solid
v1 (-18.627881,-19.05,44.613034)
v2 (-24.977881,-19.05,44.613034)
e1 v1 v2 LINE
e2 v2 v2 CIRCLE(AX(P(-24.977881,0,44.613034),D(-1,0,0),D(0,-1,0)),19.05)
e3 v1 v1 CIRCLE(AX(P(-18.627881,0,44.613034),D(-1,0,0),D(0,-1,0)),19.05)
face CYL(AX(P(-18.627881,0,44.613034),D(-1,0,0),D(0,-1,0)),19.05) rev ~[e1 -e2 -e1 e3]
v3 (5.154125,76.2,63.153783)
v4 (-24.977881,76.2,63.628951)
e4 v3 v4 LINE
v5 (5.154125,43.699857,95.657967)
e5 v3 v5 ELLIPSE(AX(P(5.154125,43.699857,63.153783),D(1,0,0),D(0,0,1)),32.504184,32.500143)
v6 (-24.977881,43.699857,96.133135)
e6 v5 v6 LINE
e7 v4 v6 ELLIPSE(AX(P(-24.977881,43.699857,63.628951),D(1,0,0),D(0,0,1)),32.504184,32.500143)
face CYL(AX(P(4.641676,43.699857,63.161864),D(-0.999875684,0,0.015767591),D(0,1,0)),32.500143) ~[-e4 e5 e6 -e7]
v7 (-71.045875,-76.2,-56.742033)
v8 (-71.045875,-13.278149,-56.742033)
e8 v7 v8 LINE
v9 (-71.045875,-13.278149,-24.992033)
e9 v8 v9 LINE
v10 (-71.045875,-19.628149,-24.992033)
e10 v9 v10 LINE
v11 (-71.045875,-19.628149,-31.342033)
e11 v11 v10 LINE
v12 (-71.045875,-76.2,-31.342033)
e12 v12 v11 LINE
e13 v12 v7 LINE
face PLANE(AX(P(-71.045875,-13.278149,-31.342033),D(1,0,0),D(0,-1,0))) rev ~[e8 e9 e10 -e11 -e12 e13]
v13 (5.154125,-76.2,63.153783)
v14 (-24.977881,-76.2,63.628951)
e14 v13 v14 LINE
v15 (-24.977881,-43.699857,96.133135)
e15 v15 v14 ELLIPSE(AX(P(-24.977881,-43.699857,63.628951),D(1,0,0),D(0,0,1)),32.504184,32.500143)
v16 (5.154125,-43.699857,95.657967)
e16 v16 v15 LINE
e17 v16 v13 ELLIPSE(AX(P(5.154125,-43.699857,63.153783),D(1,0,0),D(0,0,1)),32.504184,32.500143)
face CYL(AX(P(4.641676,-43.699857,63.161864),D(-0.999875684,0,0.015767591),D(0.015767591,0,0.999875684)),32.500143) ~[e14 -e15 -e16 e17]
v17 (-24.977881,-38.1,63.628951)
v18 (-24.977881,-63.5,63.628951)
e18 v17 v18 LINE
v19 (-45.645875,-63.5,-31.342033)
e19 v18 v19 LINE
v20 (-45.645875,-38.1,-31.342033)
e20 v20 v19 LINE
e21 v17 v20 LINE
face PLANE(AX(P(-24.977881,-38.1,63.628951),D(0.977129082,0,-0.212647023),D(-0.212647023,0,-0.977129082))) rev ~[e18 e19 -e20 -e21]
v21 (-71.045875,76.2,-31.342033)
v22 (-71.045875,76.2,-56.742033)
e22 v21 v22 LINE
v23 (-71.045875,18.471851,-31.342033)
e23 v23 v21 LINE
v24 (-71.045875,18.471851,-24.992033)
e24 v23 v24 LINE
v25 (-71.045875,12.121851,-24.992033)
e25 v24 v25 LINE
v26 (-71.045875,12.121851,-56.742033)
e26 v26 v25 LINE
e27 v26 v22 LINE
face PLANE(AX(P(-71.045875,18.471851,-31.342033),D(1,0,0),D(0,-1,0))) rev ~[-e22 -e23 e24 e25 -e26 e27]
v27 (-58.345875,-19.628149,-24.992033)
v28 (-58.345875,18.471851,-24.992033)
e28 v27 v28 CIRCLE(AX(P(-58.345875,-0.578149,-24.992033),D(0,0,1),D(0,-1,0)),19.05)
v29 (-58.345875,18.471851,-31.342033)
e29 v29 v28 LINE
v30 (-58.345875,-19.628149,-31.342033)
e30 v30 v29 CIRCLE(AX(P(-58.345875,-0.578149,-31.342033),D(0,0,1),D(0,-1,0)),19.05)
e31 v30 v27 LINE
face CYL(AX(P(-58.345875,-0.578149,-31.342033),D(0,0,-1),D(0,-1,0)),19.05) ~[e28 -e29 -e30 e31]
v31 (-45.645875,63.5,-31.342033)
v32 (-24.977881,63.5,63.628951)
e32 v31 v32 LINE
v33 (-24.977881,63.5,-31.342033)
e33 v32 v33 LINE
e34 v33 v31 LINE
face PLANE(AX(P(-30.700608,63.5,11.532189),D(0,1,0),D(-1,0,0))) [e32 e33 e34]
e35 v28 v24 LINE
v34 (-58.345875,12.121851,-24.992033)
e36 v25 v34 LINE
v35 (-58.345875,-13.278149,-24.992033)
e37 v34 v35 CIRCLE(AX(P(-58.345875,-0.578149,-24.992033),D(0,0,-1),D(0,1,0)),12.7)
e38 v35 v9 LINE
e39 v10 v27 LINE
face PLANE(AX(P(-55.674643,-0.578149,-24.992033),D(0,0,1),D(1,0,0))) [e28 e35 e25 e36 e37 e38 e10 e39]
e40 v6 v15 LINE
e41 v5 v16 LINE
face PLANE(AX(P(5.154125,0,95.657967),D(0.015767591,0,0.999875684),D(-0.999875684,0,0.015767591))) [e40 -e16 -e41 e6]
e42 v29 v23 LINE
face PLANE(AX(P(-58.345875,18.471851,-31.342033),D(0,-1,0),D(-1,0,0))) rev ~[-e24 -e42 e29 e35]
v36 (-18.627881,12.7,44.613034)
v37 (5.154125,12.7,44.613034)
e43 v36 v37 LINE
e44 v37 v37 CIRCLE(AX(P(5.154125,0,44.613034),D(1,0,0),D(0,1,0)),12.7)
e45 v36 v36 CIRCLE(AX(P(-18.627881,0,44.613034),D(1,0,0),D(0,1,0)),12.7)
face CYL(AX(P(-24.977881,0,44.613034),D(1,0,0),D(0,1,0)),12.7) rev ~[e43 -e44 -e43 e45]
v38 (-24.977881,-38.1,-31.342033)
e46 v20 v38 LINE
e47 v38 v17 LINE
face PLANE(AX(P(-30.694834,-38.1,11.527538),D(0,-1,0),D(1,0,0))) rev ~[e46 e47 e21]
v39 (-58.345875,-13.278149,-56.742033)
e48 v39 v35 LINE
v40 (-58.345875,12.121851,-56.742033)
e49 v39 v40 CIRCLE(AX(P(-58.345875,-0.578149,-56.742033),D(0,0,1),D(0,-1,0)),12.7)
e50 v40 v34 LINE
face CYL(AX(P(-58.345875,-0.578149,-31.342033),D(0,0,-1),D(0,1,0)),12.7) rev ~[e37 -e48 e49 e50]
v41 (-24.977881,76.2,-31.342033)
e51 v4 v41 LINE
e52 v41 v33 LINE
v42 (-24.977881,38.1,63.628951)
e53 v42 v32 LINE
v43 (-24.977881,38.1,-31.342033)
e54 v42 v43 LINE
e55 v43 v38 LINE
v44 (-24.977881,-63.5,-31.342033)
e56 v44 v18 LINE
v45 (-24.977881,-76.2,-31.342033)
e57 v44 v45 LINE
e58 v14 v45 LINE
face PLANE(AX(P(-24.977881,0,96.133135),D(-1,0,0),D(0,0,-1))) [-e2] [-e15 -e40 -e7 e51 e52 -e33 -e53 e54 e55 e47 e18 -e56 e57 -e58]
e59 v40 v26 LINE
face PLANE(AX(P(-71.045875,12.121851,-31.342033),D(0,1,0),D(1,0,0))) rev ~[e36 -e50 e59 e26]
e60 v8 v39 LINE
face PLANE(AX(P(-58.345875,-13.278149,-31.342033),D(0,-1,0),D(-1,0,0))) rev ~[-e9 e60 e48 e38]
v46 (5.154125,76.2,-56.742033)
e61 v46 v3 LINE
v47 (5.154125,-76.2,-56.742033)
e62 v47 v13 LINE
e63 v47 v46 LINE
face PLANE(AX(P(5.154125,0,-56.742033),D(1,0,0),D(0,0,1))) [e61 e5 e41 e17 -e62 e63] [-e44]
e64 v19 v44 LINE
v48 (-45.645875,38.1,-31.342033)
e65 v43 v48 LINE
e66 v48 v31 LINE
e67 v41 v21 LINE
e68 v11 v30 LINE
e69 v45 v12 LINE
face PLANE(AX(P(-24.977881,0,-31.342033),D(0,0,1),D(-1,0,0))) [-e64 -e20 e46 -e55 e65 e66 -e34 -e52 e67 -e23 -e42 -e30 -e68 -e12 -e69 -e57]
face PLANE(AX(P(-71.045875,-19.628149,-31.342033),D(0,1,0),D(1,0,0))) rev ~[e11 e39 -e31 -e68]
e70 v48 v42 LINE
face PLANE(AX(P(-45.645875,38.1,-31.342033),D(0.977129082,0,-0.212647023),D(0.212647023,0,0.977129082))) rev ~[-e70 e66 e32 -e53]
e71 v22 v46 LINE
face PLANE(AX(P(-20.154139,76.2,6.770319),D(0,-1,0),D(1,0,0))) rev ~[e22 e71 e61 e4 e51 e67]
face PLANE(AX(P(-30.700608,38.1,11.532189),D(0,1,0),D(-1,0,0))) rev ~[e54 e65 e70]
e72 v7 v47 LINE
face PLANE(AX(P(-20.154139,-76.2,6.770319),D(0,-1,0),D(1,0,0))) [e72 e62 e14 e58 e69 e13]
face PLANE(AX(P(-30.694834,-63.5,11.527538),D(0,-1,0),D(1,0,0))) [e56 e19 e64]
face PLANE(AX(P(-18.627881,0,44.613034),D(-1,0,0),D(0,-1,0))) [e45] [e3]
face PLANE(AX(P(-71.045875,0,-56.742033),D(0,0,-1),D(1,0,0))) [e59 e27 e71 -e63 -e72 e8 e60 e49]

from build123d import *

# Parameters (mm, degrees)
F1_DEPTH       = 76.2
F3_DEPTH       = 25.4
F4_R           = 32.5001429767
F8_D           = 25.4
F8_CBORE_D     = 38.1
F8_CBORE_DEPTH = 6.35
F10_DEPTH      = 25.4
F12_DEPTH      = 25.4
F14_DEPTH      = 6.35


# Not quite as in the source:
# - a feature names something its author has since deleted; it is built from what else it names


with BuildPart() as f1:
    # F0 (on Front) → F1 (new body, symmetric)
    with BuildSketch(Plane.XZ):
        Polygon((5.1541254637, -56.7420329794), (5.1541254637, 95.6579670206), (-24.9778814614, 96.1331352592), (-24.9778814614, -31.3420329794), (-71.0458745363, -31.3420329794), (-71.0458745363, -56.7420329794), align=None)
    extrude(amount=F1_DEPTH, both=True)

    # F2 (on face) → F3 (cut)
    with BuildSketch(Plane.XY.offset(-31.3420329794)):
        with BuildLine():
            Line((-71.0458745363, 12.1218512269), (-71.0458745363, -13.2781487731))
            Line((-71.0458745363, -13.2781487731), (-58.3458745363, -13.2781487731))
            ThreePointArc((-58.3458745363, -13.2781487731), (-45.6458745363, -0.5781487731), (-58.3458745363, 12.1218512269))
            Line((-58.3458745363, 12.1218512269), (-71.0458745363, 12.1218512269))
        make_face()
    extrude(amount=-F3_DEPTH, mode=Mode.SUBTRACT)

    # F4
    f4_edges = [f1.edges().sort_by_distance(p)[0] for p in [
        (-9.911878, 76.2, 95.895551),
        (-9.911878, -76.2, 95.895551),
    ]]
    fillet(f4_edges, radius=F4_R)

    # F8 (through all)
    with Locations(Plane(origin=(-24.9778814614, 0, 0), x_dir=(0, -1, 0), z_dir=(-1, 0, 0))):
        with Locations((0, 44.6130335331)):
            CounterBoreHole(F8_D / 2, F8_CBORE_D / 2, F8_CBORE_DEPTH)

    # F9 (on face) → F10 (join)
    with BuildSketch(Plane.XZ.offset(38.1)):
        Polygon((-24.9547883868, -31.3420329794), (-24.9778814614, 63.6289514861), (-45.6458745363, -31.3420329794), align=None)
    extrude(amount=F10_DEPTH)

    # F11 (on face) → F12 (join)
    with BuildSketch(Plane(origin=(0, 38.1, 0), x_dir=(-1, 0, 0), z_dir=(0, 1, 0))):
        Polygon((45.6458745363, -31.3420329794), (24.9778814614, 63.6289514861), (24.9778814614, -31.3420329794), align=None)
    extrude(amount=F12_DEPTH)

    # F13 (on face) → F14 (join)
    with BuildSketch(Plane.XY.offset(-31.3420329794)):
        with BuildLine():
            Line((-71.0458745363, 18.4718512269), (-71.0458745363, 12.1218512269))
            Line((-71.0458745363, 12.1218512269), (-58.3458745363, 12.1218512269))
            ThreePointArc((-58.3458745363, 12.1218512269), (-45.6458745363, -0.5781487731), (-58.3458745363, -13.2781487731))
            Line((-58.3458745363, -13.2781487731), (-71.0458745363, -13.2781487731))
            Line((-71.0458745363, -13.2781487731), (-71.0458745363, -19.6281487731))
            Line((-71.0458745363, -19.6281487731), (-58.3458745363, -19.6281487731))
            ThreePointArc((-58.3458745363, -19.6281487731), (-39.2958745363, -0.5781487731), (-58.3458745363, 18.4718512269))
            Line((-58.3458745363, 18.4718512269), (-71.0458745363, 18.4718512269))
        make_face()
    extrude(amount=F14_DEPTH)


solid = f1.part
